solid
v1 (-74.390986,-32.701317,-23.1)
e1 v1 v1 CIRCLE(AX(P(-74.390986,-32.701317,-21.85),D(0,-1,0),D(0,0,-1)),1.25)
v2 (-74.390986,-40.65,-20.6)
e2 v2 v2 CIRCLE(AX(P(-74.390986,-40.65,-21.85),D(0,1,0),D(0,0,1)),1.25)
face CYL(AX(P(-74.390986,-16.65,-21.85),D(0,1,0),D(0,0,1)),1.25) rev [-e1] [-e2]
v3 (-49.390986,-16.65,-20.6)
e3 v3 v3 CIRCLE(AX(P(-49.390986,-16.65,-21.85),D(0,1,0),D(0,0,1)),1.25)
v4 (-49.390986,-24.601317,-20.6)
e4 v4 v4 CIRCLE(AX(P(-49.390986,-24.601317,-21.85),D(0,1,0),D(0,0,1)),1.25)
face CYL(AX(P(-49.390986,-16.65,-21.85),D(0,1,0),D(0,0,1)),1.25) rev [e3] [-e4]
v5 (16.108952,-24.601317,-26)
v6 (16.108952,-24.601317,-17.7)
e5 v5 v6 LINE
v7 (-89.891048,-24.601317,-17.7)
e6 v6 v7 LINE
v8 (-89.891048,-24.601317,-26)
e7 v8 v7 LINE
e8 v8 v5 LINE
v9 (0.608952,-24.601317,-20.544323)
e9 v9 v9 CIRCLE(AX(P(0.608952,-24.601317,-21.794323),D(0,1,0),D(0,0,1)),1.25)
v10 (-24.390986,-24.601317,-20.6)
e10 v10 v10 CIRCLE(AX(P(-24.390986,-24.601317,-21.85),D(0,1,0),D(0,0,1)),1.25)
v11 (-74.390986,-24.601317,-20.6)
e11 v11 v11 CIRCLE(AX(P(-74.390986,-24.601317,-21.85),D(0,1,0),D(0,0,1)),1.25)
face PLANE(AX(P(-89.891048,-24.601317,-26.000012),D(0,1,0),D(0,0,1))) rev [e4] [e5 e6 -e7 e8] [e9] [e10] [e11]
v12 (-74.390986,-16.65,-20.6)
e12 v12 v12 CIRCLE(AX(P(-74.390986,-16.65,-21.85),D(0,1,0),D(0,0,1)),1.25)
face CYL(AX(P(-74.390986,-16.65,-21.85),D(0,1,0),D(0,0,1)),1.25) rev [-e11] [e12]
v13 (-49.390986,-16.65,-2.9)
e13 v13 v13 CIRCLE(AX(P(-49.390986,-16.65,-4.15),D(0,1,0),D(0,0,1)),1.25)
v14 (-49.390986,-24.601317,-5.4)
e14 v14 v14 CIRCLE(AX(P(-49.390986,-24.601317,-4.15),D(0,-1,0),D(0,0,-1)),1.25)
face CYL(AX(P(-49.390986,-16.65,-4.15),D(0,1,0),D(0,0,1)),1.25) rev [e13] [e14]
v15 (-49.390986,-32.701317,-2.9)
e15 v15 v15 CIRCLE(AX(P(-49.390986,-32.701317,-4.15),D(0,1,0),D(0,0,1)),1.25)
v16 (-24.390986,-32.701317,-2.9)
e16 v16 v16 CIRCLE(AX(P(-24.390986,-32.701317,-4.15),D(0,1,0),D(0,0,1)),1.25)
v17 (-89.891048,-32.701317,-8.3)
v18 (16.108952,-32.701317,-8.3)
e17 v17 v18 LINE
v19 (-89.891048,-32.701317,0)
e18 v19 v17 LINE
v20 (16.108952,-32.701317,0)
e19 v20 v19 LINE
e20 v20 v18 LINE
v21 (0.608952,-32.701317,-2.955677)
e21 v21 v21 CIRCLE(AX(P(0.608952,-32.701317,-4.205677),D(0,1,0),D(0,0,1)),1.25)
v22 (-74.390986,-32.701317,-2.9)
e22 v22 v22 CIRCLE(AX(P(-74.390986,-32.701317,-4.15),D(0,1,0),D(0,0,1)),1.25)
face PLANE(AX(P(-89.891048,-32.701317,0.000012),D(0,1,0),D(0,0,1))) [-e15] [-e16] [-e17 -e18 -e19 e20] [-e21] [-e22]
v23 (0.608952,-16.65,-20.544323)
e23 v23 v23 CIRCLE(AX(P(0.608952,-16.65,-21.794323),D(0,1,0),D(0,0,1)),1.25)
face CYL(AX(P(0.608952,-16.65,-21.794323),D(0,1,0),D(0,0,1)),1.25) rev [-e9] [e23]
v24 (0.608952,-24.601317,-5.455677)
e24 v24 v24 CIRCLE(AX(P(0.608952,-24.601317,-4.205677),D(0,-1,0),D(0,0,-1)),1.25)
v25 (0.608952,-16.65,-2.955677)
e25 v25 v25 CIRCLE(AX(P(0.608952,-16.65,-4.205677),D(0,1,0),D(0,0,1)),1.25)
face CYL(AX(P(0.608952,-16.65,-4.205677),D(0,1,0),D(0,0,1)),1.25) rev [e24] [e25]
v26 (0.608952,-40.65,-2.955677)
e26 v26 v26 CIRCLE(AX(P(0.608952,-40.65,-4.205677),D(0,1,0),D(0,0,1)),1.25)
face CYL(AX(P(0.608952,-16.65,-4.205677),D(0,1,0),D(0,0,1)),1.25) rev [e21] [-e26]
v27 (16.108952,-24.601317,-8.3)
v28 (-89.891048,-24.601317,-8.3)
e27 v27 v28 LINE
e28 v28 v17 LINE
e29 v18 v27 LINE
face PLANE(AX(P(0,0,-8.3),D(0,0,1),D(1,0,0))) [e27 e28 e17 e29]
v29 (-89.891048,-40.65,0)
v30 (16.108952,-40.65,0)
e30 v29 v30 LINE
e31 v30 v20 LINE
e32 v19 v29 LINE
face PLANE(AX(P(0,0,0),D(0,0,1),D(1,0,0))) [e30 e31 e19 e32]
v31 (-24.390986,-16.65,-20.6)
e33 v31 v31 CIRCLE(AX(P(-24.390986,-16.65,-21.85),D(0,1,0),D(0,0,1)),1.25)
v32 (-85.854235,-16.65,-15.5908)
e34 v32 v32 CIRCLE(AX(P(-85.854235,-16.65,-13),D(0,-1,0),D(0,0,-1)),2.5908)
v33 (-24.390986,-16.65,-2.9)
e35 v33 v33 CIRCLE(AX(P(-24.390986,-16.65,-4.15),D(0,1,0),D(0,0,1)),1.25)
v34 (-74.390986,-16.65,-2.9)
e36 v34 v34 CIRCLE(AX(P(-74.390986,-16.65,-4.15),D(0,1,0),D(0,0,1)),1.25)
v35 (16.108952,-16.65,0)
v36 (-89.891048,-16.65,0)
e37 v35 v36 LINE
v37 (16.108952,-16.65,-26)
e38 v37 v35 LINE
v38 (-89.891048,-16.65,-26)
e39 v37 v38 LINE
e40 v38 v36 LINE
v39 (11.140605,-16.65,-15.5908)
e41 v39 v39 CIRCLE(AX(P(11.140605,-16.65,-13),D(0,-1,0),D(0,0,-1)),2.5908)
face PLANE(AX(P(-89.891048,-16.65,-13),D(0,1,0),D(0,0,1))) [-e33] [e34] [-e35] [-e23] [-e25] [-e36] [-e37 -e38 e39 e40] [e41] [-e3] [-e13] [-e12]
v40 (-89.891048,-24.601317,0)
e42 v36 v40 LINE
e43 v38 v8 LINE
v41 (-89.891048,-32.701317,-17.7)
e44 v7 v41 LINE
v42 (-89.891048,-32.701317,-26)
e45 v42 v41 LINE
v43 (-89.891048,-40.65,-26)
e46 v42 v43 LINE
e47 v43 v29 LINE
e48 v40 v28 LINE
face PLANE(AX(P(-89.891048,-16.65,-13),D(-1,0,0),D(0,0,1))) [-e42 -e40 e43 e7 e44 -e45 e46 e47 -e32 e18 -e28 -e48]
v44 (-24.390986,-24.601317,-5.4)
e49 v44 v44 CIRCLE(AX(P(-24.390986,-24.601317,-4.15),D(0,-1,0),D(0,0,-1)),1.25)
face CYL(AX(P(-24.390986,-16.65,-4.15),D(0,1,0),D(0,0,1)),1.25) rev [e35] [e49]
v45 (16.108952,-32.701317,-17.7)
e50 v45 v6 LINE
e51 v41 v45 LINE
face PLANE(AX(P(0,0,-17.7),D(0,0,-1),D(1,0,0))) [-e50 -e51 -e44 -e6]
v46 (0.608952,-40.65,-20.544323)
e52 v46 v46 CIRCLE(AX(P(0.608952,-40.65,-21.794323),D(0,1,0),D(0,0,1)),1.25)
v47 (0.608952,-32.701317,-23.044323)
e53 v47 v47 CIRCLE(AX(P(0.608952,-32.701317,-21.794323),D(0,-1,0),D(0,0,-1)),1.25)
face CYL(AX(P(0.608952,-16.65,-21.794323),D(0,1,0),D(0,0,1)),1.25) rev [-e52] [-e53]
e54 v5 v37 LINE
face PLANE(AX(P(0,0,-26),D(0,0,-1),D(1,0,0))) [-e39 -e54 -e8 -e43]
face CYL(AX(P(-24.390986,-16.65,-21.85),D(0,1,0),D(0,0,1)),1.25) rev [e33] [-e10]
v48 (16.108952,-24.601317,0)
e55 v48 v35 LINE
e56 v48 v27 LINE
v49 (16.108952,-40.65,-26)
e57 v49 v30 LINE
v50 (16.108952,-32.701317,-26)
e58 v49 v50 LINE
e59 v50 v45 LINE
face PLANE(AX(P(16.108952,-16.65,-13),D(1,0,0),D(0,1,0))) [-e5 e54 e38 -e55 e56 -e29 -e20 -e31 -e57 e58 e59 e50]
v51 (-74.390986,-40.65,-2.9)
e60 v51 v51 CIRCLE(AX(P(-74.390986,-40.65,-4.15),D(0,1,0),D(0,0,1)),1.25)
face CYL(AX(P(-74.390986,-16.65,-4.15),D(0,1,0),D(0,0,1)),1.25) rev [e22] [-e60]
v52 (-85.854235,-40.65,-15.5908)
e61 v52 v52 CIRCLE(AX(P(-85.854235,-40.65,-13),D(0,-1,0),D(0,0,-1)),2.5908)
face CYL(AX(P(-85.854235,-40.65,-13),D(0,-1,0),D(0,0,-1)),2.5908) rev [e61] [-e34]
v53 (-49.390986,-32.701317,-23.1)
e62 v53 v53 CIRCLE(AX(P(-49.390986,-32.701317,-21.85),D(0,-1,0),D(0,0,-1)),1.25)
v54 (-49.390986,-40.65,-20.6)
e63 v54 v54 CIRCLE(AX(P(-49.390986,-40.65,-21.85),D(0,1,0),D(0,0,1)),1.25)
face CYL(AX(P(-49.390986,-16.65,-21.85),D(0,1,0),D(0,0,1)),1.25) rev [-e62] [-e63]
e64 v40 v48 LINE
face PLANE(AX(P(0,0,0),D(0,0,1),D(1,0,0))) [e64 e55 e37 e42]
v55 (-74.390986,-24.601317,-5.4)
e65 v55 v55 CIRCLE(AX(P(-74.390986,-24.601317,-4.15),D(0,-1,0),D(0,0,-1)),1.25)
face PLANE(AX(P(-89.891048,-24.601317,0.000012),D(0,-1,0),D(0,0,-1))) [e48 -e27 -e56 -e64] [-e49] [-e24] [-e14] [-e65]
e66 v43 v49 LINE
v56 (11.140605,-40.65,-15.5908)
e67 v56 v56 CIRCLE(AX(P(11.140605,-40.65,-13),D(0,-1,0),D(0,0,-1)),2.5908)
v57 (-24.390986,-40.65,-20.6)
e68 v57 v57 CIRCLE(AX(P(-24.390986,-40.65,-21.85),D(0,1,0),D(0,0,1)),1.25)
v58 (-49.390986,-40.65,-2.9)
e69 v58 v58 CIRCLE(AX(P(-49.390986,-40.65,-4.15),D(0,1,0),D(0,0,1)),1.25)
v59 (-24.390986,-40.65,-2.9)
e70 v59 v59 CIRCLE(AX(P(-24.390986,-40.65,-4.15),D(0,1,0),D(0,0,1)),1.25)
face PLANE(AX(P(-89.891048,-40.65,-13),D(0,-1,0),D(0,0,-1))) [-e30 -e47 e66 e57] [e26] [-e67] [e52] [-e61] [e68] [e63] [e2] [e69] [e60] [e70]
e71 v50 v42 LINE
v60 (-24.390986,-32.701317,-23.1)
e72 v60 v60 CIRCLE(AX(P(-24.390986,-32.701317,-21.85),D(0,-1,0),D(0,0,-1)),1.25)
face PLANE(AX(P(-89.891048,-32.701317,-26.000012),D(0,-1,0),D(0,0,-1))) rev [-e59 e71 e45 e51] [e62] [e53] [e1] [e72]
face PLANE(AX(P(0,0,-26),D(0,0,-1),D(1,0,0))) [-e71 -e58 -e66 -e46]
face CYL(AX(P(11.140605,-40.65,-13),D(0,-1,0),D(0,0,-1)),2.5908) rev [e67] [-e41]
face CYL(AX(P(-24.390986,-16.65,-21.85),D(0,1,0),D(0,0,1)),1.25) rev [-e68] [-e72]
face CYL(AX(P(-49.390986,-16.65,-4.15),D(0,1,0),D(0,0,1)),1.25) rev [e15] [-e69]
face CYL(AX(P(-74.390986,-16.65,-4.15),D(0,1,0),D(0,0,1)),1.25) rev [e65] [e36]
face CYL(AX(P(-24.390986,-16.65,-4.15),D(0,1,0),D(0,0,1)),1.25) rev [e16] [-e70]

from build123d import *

# Parameters (mm, degrees)
SKETCH4_W                  = 106
SKETCH4_H                  = 24
BOSS_EXTRUDE2_DEPTH        = 13
CUT_EXTRUDE3_START         = -8.3
SKETCH25_W                 = 106
SKETCH25_H                 = 8.1
CUT_EXTRUDE3_DEPTH         = 108.807903902
M3X0_5_TAPPED_HOLE1_D      = 2.5
MIRROR3_START              = -40.65
MIRROR3_OUTLINE_W          = 106
MIRROR3_OUTLINE_H          = 4.7
MIRROR3_DEPTH              = 24
MIRROR3_START_2            = -24.601316976
MIRROR3_2_OUTLINE_W        = 106
MIRROR3_2_OUTLINE_H        = 8.3
MIRROR3_2_OUTLINE_R        = 1.25
MIRROR3_2_DEPTH            = 7.951316976
MIRROR3_3_OUTLINE_W        = 106
MIRROR3_3_OUTLINE_H        = 8.3
MIRROR3_3_OUTLINE_R        = 1.25
MIRROR3_3_DEPTH            = 7.948683024
F_6_0_204_DIAMETER_HOLE1_D = 5.1816


# Read off the part's stored shape, not the designer's step: Mirror3
with BuildPart() as part:
    # Sketch4 → Boss-Extrude2 (new body)
    with BuildSketch(Plane.XY):
        with Locations((-36.891047602, -28.65)):
            Rectangle(SKETCH4_W, SKETCH4_H)
    extrude(amount=-BOSS_EXTRUDE2_DEPTH)

    # Sketch25 → Cut-Extrude3 (cut)
    with BuildSketch(Plane.XY.offset(CUT_EXTRUDE3_START)):
        with Locations((-36.891047602, -28.651316976)):
            Rectangle(SKETCH25_W, SKETCH25_H)
    extrude(amount=CUT_EXTRUDE3_DEPTH, mode=Mode.SUBTRACT)

    # M3x0.5 Tapped Hole1 (through all)
    with Locations(Plane(origin=(-74.390985602, -16.65, -4.15), x_dir=(0, 0, 1), z_dir=(0, 1, 0))):
        with Locations((0, 0), (0, 25), (-0.055677319, 74.999938), (0, 50)):
            Hole(M3X0_5_TAPPED_HOLE1_D / 2)

    # Mirror3 outline → Mirror3 (add)
    with BuildSketch(Plane(origin=(0, 0, 0), x_dir=(1, 0, 0), z_dir=(0, 1, 0)).offset(MIRROR3_START)):
        with Locations((-36.891047602, 15.35)):
            Rectangle(MIRROR3_OUTLINE_W, MIRROR3_OUTLINE_H)
    extrude(amount=MIRROR3_DEPTH)

    # Mirror3 2 outline → Mirror3 2 (add)
    with BuildSketch(Plane(origin=(0, 0, 0), x_dir=(1, 0, 0), z_dir=(0, 1, 0)).offset(MIRROR3_START_2)):
        with Locations((-36.891047602, 21.85)):
            Rectangle(MIRROR3_2_OUTLINE_W, MIRROR3_2_OUTLINE_H)
        with Locations((-74.390985602, 21.85)):
            Circle(MIRROR3_2_OUTLINE_R, mode=Mode.SUBTRACT)
        with Locations((-49.390985602, 21.85)):
            Circle(MIRROR3_2_OUTLINE_R, mode=Mode.SUBTRACT)
        with Locations((-24.390985602, 21.85)):
            Circle(MIRROR3_2_OUTLINE_R, mode=Mode.SUBTRACT)
        with Locations((0.608952398, 21.794322681)):
            Circle(MIRROR3_2_OUTLINE_R, mode=Mode.SUBTRACT)
    extrude(amount=MIRROR3_2_DEPTH)

    # Mirror3 3 outline → Mirror3 3 (add)
    with BuildSketch(Plane(origin=(0, 0, 0), x_dir=(1, 0, 0), z_dir=(0, 1, 0)).offset(MIRROR3_START)):
        with Locations((-36.891047602, 21.85)):
            Rectangle(MIRROR3_3_OUTLINE_W, MIRROR3_3_OUTLINE_H)
        with Locations((-74.390985602, 21.85)):
            Circle(MIRROR3_3_OUTLINE_R, mode=Mode.SUBTRACT)
        with Locations((-49.390985602, 21.85)):
            Circle(MIRROR3_3_OUTLINE_R, mode=Mode.SUBTRACT)
        with Locations((-24.390985602, 21.85)):
            Circle(MIRROR3_3_OUTLINE_R, mode=Mode.SUBTRACT)
        with Locations((0.608952398, 21.794322681)):
            Circle(MIRROR3_3_OUTLINE_R, mode=Mode.SUBTRACT)
    extrude(amount=MIRROR3_3_DEPTH)

    # #6 (0.204) Diameter Hole1 (through all)
    with Locations(Plane(origin=(11.140604923, -40.65, -13), x_dir=(0, 0, -1), z_dir=(0, -1, 0))):
        with Locations((0, 0), (0, -96.994839557)):
            Hole(F_6_0_204_DIAMETER_HOLE1_D / 2)


solid = part.part
